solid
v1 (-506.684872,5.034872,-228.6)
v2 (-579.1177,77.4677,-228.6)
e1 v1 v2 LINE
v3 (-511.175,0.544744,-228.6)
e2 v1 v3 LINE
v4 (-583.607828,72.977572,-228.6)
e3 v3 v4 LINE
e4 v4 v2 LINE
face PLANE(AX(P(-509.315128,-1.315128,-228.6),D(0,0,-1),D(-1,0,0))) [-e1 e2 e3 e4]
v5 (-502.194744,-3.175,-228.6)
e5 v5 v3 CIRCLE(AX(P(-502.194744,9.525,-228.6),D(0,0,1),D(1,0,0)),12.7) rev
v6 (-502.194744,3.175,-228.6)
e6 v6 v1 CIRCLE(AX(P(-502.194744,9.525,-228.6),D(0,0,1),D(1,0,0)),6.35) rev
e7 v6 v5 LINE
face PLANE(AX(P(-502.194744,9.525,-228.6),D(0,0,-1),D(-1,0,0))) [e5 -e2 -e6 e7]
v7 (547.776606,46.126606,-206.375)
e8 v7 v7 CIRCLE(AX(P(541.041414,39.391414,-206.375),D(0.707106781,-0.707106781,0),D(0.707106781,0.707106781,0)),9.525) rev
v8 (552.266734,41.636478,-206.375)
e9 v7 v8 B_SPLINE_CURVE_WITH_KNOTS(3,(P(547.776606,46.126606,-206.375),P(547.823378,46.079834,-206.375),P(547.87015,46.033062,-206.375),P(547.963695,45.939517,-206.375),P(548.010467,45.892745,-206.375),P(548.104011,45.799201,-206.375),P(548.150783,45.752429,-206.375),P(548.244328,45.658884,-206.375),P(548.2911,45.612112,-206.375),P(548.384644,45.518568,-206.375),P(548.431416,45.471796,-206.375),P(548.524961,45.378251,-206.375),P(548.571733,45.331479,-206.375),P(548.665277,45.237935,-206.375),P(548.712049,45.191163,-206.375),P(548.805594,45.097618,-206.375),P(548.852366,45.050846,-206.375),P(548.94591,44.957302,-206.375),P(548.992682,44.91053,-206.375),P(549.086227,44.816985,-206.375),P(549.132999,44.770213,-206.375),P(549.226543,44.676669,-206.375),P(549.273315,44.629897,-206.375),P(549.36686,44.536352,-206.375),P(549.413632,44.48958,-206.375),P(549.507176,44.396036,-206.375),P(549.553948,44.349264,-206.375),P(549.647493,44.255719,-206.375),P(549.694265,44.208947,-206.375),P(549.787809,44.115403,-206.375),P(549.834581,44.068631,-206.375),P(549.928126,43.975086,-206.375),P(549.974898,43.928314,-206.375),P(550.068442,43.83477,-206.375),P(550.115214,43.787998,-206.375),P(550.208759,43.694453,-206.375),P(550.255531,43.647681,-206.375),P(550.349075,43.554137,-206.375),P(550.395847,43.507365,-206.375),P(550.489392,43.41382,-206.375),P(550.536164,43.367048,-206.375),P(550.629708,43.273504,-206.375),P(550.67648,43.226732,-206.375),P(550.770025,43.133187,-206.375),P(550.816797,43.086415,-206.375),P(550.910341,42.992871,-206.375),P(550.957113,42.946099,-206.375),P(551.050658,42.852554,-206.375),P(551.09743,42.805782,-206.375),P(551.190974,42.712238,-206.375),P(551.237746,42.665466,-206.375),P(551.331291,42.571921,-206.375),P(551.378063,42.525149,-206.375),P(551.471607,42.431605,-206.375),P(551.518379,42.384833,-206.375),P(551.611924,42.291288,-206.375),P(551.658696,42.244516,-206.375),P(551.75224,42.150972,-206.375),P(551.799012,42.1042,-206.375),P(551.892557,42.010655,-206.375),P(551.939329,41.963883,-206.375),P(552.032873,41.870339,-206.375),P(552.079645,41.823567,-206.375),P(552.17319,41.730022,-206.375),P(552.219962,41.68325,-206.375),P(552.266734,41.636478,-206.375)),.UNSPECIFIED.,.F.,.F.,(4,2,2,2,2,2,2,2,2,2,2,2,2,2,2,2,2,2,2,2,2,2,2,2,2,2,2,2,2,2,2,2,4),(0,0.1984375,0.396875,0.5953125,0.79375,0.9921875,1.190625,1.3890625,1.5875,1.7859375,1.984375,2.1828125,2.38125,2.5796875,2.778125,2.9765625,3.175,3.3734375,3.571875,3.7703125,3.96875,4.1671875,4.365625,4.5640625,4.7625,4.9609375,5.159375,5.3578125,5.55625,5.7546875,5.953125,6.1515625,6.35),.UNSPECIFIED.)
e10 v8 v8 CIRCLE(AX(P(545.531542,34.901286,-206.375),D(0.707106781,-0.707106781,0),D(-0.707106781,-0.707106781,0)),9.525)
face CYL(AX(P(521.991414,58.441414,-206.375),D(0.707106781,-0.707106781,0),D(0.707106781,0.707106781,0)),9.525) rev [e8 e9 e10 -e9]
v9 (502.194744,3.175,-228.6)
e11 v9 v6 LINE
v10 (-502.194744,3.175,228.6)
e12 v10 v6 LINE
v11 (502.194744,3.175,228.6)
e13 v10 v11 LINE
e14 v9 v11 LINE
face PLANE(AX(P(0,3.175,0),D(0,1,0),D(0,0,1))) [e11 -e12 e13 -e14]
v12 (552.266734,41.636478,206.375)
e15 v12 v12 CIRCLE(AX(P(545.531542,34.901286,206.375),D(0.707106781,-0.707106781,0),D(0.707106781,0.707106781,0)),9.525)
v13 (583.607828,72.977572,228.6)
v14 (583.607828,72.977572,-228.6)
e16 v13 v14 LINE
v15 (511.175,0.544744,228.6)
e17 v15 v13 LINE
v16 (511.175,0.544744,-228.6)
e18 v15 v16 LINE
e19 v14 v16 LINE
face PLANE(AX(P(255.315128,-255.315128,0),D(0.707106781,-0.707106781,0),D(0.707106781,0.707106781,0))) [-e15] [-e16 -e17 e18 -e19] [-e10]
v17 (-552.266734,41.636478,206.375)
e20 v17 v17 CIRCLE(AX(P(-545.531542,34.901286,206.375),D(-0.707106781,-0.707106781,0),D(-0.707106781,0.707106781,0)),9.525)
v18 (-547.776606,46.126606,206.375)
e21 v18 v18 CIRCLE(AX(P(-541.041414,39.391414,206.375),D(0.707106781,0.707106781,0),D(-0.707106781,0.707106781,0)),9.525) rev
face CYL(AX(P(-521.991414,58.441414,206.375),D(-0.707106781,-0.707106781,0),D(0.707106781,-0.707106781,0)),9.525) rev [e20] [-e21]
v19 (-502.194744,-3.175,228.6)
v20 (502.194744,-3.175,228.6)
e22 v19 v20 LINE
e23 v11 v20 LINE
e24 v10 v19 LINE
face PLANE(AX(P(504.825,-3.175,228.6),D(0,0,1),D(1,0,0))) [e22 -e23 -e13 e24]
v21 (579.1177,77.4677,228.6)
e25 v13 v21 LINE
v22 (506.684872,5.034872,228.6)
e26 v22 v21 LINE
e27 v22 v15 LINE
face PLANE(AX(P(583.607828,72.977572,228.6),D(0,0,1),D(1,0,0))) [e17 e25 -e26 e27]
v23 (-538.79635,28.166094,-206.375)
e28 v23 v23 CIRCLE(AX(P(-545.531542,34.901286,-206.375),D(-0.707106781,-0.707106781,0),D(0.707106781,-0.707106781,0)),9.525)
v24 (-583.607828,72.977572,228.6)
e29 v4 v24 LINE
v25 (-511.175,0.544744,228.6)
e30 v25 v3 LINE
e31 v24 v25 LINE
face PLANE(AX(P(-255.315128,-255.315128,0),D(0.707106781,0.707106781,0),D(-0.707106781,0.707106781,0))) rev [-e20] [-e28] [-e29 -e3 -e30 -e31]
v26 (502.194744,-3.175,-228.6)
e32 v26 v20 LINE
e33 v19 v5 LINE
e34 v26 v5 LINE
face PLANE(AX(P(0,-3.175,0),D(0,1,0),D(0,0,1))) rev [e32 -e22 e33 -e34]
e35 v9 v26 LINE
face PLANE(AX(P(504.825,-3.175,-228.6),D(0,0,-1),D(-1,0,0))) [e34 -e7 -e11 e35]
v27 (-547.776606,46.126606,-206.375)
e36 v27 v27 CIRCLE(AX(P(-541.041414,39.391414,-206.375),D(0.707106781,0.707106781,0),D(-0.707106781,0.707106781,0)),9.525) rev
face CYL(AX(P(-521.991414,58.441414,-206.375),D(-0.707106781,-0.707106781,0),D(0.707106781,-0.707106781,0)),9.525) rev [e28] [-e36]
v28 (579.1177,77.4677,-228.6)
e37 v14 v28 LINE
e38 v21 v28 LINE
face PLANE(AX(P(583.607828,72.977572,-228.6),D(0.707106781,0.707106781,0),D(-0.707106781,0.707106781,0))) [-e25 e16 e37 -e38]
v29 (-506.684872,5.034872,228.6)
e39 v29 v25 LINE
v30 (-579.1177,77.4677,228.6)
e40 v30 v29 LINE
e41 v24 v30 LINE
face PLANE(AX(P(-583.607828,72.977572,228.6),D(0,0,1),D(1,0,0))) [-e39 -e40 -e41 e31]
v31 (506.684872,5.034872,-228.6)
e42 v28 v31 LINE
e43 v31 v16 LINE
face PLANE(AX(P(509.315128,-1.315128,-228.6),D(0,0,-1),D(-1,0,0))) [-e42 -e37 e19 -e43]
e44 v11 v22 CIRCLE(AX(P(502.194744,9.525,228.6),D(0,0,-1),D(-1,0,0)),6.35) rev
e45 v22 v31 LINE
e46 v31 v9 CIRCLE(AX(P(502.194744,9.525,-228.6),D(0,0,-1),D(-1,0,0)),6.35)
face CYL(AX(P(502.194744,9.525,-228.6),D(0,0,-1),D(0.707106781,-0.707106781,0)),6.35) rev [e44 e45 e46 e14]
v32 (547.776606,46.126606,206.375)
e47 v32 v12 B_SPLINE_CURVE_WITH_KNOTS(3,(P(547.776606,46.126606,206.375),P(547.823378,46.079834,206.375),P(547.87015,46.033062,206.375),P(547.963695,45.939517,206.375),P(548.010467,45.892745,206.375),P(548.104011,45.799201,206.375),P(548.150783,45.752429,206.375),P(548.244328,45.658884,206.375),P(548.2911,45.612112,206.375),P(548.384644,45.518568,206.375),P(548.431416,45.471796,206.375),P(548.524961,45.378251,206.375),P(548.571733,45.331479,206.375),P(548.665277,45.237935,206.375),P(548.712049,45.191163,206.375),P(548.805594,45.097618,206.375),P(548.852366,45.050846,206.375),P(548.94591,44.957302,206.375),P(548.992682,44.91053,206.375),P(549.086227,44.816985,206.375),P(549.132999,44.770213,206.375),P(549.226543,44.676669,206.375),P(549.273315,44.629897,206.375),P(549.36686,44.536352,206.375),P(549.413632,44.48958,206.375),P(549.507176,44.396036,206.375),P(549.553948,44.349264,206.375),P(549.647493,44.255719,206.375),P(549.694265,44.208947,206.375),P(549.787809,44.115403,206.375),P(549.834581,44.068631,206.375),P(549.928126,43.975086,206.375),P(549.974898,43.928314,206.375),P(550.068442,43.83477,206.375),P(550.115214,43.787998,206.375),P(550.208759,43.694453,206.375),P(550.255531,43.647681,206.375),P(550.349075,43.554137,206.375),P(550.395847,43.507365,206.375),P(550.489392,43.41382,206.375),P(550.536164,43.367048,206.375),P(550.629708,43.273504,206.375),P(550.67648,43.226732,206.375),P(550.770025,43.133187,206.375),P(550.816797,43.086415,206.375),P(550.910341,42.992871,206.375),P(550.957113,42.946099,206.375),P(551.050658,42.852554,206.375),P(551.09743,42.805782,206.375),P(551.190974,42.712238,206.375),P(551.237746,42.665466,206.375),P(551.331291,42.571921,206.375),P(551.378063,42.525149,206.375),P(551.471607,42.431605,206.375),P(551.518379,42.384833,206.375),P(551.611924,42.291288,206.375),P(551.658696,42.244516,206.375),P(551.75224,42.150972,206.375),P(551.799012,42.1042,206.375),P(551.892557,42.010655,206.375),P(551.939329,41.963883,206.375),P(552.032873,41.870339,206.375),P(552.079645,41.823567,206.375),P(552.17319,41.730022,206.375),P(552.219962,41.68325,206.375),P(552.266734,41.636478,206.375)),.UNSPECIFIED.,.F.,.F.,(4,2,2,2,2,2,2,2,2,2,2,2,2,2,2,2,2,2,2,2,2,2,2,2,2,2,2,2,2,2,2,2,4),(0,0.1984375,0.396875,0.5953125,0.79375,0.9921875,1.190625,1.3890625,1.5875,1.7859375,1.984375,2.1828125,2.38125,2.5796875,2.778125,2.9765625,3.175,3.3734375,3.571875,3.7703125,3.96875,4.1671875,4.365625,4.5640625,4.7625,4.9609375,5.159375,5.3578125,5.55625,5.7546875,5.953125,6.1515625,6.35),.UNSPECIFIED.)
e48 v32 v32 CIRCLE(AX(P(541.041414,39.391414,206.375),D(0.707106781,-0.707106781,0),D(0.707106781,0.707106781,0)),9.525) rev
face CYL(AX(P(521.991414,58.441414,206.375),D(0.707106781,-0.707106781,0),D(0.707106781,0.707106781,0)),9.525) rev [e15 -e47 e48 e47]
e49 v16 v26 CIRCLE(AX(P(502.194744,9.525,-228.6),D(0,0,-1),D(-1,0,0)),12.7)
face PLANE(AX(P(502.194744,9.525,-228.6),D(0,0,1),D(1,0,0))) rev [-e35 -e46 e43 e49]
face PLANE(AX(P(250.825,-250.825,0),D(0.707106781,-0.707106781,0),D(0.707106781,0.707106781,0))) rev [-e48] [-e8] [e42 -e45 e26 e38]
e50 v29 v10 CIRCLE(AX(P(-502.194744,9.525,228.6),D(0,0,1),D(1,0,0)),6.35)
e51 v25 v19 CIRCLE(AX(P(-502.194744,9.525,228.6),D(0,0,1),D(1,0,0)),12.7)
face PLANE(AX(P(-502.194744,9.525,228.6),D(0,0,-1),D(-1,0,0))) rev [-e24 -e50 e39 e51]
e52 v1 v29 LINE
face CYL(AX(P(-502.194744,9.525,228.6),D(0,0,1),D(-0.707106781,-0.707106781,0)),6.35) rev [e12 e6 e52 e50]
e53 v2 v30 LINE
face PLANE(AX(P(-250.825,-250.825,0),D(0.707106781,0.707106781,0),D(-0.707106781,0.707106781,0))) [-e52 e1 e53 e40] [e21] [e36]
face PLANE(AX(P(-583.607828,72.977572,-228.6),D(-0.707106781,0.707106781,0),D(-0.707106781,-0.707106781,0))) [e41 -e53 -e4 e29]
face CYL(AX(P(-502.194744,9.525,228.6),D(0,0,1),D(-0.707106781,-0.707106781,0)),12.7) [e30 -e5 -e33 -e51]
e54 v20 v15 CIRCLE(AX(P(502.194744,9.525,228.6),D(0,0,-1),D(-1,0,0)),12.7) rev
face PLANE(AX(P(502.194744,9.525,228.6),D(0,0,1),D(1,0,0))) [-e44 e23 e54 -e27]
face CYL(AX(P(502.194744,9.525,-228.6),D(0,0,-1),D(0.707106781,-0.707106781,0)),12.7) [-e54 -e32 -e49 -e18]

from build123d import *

# Parameters (mm, degrees)
BASE_FLANGE1_START             = -3.175
BASE_FLANGE1_OUTLINE_W         = 1009.65
BASE_FLANGE1_OUTLINE_H         = 457.2
BASE_FLANGE1_DEPTH             = 6.35
EDGE_FLANGE1_STRIP_CUT_DEPTH   = 457.2
EDGE_FLANGE1_STRIP_CUT_2_DEPTH = 457.2
EDGE_FLANGE1_DEPTH             = 457.2
EDGE_FLANGE1_BEND_DEPTH        = 457.2
SKETCH12_R                     = 9.525
CUT_EXTRUDE1_DEPTH             = 6.35
SKETCH13_R                     = 9.525
CUT_EXTRUDE2_DEPTH             = 6.35


# Read off the part's stored shape, not the designer's step: Base-Flange1
# Sheet-metal steps are written as plain solids
with BuildPart() as part:
    # Base-Flange1 outline → Base-Flange1 (new body)
    with BuildSketch(Plane(origin=(0, 0, 0), x_dir=(1, 0, 0), z_dir=(0, 1, 0)).offset(BASE_FLANGE1_START)):
        Rectangle(BASE_FLANGE1_OUTLINE_W, BASE_FLANGE1_OUTLINE_H)
    extrude(amount=BASE_FLANGE1_DEPTH)

    # Edge-Flange1 strip (across the edge) → Edge-Flange1 strip cut (cut)
    with BuildSketch(Plane(origin=(504.825, 3.175, 228.6), x_dir=(-0.7071067811865438, 0.7071067811865512, 0), z_dir=(0, 0, -1))):
        Polygon((-29.571024484, 20.590768363), (-2.630256121, -6.35), (1.859871939, -1.859871939), (-25.080896424, 25.080896424), align=None)
    extrude(amount=EDGE_FLANGE1_STRIP_CUT_DEPTH, mode=Mode.SUBTRACT)

    # Edge-Flange1 strip 2 (across the edge) → Edge-Flange1 strip cut 2 (cut)
    with BuildSketch(Plane(origin=(-504.825, 3.175, -228.6), x_dir=(0.7071067811865438, 0.7071067811865512, 0), z_dir=(0, 0, 1))):
        Polygon((-29.571024484, 20.590768363), (-2.630256121, -6.35), (1.859871939, -1.859871939), (-25.080896424, 25.080896424), align=None)
    extrude(amount=EDGE_FLANGE1_STRIP_CUT_2_DEPTH, mode=Mode.SUBTRACT)

    # Edge-Flange1 section (across the edge) → Edge-Flange1 (add)
    with BuildSketch(Plane(origin=(504.825, 3.175, 228.6), x_dir=(-0.7071067811865438, 0.7071067811865512, 0), z_dir=(0, 0, -1))):
        with BuildLine():
            Line((-6.35, 2.630256121), (-6.35, 105.065743879))
            Line((-6.35, 105.065743879), (0, 105.065743879))
            Line((0, 105.065743879), (0, 2.630256121))
            ThreePointArc((0, 2.630256121), (0.483364969, 0.200216326), (1.859871939, -1.859871939))
            Line((1.859871939, -1.859871939), (-2.630256121, -6.35))
            ThreePointArc((-2.630256121, -6.35), (-5.383270063, -2.22982347), (-6.35, 2.630256121))
        make_face()
    extrude(amount=EDGE_FLANGE1_DEPTH)

    # Edge-Flange1 section 2 (across the edge) → Edge-Flange1 bend (add)
    with BuildSketch(Plane(origin=(-504.825, 3.175, -228.6), x_dir=(0.7071067811865438, 0.7071067811865512, 0), z_dir=(0, 0, 1))):
        with BuildLine():
            Line((-6.35, 2.630256121), (-6.35, 105.065743879))
            Line((-6.35, 105.065743879), (0, 105.065743879))
            Line((0, 105.065743879), (0, 2.630256121))
            ThreePointArc((0, 2.630256121), (0.483364969, 0.200216326), (1.859871939, -1.859871939))
            Line((1.859871939, -1.859871939), (-2.630256121, -6.35))
            ThreePointArc((-2.630256121, -6.35), (-5.383270063, -2.22982347), (-6.35, 2.630256121))
        make_face()
    extrude(amount=EDGE_FLANGE1_BEND_DEPTH)

    # Sketch12 → Cut-Extrude1 (cut)
    with BuildSketch(Plane(origin=(255.315128061, -255.315128061, 0), x_dir=(-0.7071067811865513, -0.7071067811865438, 0), z_dir=(0.7071067811865438, -0.7071067811865513, 0))):
        with Locations(Location((-410.427988722, -206.375, 0), (0, 0, 180))):
            Circle(SKETCH12_R)
        with Locations(Location((-410.427988722, 206.375, 0), (0, 0, 180))):
            Circle(SKETCH12_R)
    extrude(amount=-CUT_EXTRUDE1_DEPTH, mode=Mode.SUBTRACT)

    # Sketch13 → Cut-Extrude2 (cut)
    with BuildSketch(Plane(origin=(-255.315128061, -255.315128061, 0), x_dir=(0, 0, 1), z_dir=(-0.7071067811865442, -0.7071067811865509, 0))):
        with Locations(Location((-206.375, 410.427988722, 0), (0, 0, 270))):
            Circle(SKETCH13_R)
        with Locations(Location((206.375, 410.427988722, 0), (0, 0, 90))):
            Circle(SKETCH13_R)
    extrude(amount=-CUT_EXTRUDE2_DEPTH, mode=Mode.SUBTRACT)


solid = part.part
